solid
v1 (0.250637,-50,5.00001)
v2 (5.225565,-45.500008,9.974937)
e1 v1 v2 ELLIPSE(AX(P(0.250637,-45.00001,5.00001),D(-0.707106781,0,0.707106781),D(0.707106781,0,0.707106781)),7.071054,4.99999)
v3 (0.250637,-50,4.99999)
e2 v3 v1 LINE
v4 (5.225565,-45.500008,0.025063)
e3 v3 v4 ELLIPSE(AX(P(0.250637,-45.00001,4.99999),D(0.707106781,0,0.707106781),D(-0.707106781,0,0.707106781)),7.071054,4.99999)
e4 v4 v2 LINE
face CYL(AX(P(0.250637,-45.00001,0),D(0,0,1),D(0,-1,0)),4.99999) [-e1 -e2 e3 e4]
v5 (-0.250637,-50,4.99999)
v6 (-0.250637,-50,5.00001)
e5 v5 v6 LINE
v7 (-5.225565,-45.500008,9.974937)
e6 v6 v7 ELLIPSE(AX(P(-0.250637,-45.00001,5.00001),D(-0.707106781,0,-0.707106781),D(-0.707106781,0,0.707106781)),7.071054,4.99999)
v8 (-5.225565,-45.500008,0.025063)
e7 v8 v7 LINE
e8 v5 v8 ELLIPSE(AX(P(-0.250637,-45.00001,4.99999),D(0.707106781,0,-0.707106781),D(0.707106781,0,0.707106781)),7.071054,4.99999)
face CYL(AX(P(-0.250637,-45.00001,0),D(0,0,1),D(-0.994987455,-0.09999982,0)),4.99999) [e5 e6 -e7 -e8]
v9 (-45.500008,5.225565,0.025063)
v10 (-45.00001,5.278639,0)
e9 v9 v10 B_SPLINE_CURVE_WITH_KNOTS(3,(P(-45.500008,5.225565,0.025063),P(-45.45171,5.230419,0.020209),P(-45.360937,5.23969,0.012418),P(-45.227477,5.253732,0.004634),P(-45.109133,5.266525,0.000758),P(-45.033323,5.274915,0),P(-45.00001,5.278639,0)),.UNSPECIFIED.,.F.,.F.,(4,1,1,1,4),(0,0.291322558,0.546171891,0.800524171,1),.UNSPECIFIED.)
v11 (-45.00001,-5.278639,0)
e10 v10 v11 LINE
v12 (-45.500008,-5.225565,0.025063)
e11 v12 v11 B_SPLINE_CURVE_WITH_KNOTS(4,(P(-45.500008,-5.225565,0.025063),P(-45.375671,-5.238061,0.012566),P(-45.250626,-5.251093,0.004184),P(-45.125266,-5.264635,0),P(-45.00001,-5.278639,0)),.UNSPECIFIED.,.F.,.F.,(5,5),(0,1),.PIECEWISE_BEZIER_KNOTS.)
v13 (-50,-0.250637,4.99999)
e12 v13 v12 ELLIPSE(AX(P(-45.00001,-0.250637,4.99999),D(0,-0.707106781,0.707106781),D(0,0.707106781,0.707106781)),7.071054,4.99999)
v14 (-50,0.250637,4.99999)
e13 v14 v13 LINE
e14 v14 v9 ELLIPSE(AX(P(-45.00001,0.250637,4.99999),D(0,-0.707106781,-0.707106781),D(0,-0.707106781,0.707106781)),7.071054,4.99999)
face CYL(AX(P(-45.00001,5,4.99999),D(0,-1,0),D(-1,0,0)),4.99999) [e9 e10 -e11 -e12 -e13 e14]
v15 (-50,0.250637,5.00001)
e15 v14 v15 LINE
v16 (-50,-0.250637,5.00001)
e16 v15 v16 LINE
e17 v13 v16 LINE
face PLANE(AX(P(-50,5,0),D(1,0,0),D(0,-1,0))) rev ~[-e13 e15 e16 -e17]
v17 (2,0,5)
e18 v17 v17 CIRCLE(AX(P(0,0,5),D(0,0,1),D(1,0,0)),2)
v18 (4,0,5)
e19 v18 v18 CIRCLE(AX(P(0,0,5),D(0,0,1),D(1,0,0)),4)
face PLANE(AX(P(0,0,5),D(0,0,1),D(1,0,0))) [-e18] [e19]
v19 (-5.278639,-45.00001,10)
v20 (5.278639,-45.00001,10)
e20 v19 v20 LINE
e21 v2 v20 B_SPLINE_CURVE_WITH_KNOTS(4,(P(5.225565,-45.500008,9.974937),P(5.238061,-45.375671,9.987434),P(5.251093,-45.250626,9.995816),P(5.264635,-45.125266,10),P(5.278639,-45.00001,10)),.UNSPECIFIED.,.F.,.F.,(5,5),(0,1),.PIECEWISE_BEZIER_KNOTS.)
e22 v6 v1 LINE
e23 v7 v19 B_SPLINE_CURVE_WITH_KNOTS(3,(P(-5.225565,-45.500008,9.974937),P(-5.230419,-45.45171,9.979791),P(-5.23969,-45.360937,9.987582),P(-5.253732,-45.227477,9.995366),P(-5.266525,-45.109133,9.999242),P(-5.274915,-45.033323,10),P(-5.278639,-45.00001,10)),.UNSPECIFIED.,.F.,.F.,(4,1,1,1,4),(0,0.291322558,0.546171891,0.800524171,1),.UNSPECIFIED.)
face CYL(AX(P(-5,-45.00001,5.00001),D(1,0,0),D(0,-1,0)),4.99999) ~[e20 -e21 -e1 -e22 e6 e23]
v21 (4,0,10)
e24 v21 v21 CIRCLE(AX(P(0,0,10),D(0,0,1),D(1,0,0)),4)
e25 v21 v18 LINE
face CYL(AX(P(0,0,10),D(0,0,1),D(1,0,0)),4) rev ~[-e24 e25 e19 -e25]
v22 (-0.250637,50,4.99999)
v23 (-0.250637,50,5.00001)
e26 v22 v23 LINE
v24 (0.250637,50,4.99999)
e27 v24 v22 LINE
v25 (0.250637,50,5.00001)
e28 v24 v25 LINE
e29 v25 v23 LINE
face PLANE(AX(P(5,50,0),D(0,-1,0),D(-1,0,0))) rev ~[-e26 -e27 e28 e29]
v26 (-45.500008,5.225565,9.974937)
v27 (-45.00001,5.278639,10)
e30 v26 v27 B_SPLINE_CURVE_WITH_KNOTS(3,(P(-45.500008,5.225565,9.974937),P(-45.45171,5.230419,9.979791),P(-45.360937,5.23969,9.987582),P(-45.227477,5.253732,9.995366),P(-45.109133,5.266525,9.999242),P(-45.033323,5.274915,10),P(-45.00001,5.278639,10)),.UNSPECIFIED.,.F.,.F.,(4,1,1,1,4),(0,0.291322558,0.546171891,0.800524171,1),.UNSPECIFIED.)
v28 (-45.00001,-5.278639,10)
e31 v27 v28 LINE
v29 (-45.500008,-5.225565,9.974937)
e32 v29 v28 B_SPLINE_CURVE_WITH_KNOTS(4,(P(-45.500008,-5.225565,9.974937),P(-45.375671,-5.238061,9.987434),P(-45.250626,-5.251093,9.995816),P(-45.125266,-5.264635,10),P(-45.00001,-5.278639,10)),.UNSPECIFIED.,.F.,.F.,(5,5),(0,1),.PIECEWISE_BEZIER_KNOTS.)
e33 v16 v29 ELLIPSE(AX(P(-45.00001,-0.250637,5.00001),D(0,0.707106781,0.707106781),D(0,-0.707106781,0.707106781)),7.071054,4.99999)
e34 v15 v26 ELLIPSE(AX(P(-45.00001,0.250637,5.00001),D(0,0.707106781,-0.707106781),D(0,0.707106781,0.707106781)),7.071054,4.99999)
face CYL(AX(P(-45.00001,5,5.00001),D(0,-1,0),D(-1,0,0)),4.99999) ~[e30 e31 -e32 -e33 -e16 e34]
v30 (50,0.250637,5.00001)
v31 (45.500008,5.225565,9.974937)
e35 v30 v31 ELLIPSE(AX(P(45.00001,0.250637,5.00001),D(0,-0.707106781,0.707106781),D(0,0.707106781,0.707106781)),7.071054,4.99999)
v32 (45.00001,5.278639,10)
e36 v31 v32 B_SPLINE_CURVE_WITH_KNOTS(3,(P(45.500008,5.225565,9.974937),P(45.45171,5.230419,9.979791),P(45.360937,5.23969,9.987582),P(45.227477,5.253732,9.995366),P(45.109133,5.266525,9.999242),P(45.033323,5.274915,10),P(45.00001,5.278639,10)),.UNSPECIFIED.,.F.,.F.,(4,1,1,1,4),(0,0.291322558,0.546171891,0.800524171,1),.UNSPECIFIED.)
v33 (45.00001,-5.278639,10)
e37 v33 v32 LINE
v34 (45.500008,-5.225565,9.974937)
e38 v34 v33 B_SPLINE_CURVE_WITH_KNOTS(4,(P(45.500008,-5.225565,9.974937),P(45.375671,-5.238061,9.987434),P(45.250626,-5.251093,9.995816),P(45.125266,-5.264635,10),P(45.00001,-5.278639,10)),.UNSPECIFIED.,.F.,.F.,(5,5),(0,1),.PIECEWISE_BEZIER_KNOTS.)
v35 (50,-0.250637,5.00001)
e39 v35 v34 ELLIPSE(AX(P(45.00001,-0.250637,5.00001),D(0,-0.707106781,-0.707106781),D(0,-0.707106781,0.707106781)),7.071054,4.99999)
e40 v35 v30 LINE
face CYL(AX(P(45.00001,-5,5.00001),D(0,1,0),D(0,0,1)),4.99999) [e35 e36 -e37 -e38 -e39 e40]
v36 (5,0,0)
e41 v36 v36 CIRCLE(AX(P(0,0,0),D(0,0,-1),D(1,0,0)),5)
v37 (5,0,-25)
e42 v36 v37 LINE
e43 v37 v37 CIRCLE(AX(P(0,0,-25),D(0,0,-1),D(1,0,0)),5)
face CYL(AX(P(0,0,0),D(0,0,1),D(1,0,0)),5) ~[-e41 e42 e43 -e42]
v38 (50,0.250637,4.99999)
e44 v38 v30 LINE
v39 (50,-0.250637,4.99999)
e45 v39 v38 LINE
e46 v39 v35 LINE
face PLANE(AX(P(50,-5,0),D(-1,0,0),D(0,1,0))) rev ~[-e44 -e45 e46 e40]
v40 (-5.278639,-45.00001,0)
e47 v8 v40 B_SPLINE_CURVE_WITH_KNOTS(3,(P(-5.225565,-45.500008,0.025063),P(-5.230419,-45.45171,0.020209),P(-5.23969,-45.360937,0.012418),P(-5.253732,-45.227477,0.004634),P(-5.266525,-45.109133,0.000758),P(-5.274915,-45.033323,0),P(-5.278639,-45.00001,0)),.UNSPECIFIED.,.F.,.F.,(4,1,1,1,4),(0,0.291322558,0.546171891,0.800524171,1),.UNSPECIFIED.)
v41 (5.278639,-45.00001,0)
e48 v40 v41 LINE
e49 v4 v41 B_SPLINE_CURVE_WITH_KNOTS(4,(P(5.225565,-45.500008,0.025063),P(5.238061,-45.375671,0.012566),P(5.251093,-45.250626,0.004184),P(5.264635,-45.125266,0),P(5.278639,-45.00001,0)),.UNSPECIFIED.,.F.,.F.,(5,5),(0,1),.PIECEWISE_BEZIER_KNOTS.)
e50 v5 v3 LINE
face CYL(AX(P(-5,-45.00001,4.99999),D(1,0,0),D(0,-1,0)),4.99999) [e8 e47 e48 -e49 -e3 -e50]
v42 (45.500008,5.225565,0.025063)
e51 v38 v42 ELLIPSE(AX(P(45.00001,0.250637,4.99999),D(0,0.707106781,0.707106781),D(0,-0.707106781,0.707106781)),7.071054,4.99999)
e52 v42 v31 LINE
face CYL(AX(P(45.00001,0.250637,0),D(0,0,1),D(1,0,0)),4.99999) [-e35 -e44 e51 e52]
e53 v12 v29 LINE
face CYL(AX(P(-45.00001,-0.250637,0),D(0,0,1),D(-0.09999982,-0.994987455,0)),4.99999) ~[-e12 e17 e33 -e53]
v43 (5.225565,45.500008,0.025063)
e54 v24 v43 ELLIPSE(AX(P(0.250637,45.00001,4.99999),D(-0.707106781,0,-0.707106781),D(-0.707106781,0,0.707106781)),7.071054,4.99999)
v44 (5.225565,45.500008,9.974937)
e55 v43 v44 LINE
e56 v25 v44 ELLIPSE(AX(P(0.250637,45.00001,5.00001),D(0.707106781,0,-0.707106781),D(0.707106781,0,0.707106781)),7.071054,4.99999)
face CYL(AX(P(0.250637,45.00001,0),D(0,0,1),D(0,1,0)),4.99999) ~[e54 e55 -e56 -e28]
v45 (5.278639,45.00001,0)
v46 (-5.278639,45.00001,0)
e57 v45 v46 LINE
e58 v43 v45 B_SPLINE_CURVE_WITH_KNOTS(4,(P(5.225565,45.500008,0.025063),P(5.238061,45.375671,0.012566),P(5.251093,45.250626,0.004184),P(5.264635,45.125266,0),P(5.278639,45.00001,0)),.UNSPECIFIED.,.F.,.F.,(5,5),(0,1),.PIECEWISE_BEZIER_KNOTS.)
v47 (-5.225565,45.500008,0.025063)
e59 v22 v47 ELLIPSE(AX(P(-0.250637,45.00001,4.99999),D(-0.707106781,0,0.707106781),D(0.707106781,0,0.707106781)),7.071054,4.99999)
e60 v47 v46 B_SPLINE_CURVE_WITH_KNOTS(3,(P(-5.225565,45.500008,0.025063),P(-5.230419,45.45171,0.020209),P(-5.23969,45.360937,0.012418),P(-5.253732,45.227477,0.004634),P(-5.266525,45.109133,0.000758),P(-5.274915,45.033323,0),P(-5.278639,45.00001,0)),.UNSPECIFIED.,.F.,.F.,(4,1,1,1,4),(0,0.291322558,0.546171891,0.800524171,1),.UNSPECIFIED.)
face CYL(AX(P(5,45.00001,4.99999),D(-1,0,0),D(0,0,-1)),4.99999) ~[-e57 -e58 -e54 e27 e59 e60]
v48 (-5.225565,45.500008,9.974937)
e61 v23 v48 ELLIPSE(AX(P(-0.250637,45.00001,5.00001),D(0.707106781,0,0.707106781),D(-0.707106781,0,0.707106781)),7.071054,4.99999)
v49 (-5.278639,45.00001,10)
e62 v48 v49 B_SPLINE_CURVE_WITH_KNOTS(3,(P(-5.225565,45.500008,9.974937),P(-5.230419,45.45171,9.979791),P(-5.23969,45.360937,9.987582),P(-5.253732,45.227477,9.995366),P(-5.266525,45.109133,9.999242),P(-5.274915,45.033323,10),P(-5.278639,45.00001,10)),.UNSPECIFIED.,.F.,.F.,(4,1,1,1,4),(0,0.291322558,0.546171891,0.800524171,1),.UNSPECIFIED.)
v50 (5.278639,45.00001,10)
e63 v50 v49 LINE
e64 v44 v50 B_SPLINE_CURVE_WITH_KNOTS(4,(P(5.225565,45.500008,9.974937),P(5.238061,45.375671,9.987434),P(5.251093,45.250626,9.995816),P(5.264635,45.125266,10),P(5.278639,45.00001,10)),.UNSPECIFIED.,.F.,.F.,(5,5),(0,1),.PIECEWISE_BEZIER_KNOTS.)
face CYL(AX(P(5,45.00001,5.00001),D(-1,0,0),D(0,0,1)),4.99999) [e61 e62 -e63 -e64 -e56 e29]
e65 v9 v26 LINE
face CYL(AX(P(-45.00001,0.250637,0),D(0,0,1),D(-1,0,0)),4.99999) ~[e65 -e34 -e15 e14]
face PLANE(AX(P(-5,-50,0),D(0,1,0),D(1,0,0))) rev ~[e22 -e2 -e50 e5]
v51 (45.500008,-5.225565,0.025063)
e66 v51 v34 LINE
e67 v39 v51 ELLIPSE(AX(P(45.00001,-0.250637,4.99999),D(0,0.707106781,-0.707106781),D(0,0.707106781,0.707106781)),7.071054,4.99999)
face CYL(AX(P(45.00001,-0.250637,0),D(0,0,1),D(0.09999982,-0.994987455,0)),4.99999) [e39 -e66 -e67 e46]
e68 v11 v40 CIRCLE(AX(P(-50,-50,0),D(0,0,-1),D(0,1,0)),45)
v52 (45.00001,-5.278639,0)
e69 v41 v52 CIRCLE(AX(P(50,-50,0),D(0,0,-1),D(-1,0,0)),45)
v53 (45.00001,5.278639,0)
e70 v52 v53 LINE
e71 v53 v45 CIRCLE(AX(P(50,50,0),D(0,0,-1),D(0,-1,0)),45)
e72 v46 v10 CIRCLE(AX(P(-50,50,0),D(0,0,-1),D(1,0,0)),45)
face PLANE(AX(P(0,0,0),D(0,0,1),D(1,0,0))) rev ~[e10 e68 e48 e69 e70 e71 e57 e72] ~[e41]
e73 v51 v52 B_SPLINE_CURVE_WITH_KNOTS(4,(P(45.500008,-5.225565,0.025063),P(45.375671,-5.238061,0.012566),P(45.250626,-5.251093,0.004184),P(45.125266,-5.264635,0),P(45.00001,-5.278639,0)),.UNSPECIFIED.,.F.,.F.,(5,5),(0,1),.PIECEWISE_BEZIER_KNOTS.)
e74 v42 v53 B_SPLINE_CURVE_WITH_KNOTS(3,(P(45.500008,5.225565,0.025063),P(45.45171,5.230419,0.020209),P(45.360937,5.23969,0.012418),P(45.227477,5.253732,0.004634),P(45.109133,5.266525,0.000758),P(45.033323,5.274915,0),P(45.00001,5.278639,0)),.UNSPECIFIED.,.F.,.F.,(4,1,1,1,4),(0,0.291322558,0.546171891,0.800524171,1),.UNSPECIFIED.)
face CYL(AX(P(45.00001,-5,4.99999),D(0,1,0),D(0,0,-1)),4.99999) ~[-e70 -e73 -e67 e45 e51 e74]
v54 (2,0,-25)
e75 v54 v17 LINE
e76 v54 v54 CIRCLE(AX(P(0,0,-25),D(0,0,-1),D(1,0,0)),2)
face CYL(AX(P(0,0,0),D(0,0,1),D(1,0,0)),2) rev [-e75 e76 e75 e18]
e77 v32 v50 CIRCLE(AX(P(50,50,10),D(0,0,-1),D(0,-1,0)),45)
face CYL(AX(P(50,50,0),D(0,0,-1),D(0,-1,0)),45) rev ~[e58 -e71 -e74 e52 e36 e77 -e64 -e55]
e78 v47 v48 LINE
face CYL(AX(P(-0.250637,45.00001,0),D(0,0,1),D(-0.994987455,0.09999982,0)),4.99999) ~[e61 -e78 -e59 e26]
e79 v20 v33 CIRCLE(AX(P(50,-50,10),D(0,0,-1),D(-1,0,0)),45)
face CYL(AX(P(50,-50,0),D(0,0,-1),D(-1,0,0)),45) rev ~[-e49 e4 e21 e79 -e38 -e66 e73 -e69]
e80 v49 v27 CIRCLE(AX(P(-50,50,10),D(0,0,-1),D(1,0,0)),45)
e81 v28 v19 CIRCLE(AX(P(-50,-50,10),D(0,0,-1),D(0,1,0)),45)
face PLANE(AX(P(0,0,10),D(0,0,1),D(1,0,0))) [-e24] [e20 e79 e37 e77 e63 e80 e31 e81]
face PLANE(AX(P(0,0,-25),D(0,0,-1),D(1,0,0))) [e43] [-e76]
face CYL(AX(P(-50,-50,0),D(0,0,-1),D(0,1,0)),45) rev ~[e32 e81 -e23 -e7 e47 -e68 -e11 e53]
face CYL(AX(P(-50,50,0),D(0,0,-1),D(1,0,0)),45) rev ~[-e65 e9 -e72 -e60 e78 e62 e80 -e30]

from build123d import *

# Parameters (mm, degrees)
F1_DEPTH = 10
F2_R     = 2
F3_DEPTH = 10
F2_R_2   = 4
F4_DEPTH = 5
F5_R     = 4.99999
F6_R     = 5
F6_R_2   = 2
F7_DEPTH = 25


# Not quite as in the source:
# - a fillet or chamfer is up to 0.001 mm smaller than in the source, because OpenCascade refuses the exact size


with BuildPart() as f1:
    # F0 (on Top) → F1 (new body)
    with BuildSketch(Plane.XY):
        with BuildLine():
            ThreePointArc((-50, -5), (-18.1801948466, -18.1801948466), (-5, -50))
            Line((-5, -50), (5, -50))
            ThreePointArc((5, -50), (18.1801948466, -18.1801948466), (50, -5))
            Line((50, -5), (50, 5))
            ThreePointArc((50, 5), (18.1801948466, 18.1801948466), (5, 50))
            Line((5, 50), (-5, 50))
            ThreePointArc((-5, 50), (-18.1801948466, 18.1801948466), (-50, 5))
            Line((-50, 5), (-50, -5))
        make_face()
    extrude(amount=F1_DEPTH)

    # F2 (on face) → F3 (cut, through all)
    with BuildSketch(Plane.XY.offset(10)):
        Circle(F2_R)
    extrude(amount=-F3_DEPTH, mode=Mode.SUBTRACT)

    # F2 (on face) → F4 (cut)
    with BuildSketch(Plane.XY.offset(10)):
        Circle(F2_R_2)
        Circle(F2_R, mode=Mode.SUBTRACT)
    extrude(amount=-F4_DEPTH, mode=Mode.SUBTRACT)

    # F5 (radius 5 in the source; OpenCascade refuses exactly that, so slightly less here)
    f5_edges = [f1.edges().sort_by_distance(p)[0] for p in [
        (5, 50, 5),
        (-5, 50, 5),
        (0, 50, 0),
        (0, 50, 10),
        (-50, 5, 5),
        (-50, -5, 5),
        (-50, 0, 0),
        (-50, 0, 10),
        (-5, -50, 5),
        (5, -50, 5),
        (0, -50, 0),
        (0, -50, 10),
        (50, -5, 5),
        (50, 5, 5),
        (50, 0, 0),
        (50, 0, 10),
    ]]
    fillet(f5_edges, radius=F5_R)

    # F6 (on face) → F7 (join)
    with BuildSketch(Plane(origin=(0, 0, 0), x_dir=(1, 0, 0), z_dir=(0, 0, -1))):
        Circle(F6_R)
        Circle(F6_R_2, mode=Mode.SUBTRACT)
    extrude(amount=F7_DEPTH)


solid = f1.part
